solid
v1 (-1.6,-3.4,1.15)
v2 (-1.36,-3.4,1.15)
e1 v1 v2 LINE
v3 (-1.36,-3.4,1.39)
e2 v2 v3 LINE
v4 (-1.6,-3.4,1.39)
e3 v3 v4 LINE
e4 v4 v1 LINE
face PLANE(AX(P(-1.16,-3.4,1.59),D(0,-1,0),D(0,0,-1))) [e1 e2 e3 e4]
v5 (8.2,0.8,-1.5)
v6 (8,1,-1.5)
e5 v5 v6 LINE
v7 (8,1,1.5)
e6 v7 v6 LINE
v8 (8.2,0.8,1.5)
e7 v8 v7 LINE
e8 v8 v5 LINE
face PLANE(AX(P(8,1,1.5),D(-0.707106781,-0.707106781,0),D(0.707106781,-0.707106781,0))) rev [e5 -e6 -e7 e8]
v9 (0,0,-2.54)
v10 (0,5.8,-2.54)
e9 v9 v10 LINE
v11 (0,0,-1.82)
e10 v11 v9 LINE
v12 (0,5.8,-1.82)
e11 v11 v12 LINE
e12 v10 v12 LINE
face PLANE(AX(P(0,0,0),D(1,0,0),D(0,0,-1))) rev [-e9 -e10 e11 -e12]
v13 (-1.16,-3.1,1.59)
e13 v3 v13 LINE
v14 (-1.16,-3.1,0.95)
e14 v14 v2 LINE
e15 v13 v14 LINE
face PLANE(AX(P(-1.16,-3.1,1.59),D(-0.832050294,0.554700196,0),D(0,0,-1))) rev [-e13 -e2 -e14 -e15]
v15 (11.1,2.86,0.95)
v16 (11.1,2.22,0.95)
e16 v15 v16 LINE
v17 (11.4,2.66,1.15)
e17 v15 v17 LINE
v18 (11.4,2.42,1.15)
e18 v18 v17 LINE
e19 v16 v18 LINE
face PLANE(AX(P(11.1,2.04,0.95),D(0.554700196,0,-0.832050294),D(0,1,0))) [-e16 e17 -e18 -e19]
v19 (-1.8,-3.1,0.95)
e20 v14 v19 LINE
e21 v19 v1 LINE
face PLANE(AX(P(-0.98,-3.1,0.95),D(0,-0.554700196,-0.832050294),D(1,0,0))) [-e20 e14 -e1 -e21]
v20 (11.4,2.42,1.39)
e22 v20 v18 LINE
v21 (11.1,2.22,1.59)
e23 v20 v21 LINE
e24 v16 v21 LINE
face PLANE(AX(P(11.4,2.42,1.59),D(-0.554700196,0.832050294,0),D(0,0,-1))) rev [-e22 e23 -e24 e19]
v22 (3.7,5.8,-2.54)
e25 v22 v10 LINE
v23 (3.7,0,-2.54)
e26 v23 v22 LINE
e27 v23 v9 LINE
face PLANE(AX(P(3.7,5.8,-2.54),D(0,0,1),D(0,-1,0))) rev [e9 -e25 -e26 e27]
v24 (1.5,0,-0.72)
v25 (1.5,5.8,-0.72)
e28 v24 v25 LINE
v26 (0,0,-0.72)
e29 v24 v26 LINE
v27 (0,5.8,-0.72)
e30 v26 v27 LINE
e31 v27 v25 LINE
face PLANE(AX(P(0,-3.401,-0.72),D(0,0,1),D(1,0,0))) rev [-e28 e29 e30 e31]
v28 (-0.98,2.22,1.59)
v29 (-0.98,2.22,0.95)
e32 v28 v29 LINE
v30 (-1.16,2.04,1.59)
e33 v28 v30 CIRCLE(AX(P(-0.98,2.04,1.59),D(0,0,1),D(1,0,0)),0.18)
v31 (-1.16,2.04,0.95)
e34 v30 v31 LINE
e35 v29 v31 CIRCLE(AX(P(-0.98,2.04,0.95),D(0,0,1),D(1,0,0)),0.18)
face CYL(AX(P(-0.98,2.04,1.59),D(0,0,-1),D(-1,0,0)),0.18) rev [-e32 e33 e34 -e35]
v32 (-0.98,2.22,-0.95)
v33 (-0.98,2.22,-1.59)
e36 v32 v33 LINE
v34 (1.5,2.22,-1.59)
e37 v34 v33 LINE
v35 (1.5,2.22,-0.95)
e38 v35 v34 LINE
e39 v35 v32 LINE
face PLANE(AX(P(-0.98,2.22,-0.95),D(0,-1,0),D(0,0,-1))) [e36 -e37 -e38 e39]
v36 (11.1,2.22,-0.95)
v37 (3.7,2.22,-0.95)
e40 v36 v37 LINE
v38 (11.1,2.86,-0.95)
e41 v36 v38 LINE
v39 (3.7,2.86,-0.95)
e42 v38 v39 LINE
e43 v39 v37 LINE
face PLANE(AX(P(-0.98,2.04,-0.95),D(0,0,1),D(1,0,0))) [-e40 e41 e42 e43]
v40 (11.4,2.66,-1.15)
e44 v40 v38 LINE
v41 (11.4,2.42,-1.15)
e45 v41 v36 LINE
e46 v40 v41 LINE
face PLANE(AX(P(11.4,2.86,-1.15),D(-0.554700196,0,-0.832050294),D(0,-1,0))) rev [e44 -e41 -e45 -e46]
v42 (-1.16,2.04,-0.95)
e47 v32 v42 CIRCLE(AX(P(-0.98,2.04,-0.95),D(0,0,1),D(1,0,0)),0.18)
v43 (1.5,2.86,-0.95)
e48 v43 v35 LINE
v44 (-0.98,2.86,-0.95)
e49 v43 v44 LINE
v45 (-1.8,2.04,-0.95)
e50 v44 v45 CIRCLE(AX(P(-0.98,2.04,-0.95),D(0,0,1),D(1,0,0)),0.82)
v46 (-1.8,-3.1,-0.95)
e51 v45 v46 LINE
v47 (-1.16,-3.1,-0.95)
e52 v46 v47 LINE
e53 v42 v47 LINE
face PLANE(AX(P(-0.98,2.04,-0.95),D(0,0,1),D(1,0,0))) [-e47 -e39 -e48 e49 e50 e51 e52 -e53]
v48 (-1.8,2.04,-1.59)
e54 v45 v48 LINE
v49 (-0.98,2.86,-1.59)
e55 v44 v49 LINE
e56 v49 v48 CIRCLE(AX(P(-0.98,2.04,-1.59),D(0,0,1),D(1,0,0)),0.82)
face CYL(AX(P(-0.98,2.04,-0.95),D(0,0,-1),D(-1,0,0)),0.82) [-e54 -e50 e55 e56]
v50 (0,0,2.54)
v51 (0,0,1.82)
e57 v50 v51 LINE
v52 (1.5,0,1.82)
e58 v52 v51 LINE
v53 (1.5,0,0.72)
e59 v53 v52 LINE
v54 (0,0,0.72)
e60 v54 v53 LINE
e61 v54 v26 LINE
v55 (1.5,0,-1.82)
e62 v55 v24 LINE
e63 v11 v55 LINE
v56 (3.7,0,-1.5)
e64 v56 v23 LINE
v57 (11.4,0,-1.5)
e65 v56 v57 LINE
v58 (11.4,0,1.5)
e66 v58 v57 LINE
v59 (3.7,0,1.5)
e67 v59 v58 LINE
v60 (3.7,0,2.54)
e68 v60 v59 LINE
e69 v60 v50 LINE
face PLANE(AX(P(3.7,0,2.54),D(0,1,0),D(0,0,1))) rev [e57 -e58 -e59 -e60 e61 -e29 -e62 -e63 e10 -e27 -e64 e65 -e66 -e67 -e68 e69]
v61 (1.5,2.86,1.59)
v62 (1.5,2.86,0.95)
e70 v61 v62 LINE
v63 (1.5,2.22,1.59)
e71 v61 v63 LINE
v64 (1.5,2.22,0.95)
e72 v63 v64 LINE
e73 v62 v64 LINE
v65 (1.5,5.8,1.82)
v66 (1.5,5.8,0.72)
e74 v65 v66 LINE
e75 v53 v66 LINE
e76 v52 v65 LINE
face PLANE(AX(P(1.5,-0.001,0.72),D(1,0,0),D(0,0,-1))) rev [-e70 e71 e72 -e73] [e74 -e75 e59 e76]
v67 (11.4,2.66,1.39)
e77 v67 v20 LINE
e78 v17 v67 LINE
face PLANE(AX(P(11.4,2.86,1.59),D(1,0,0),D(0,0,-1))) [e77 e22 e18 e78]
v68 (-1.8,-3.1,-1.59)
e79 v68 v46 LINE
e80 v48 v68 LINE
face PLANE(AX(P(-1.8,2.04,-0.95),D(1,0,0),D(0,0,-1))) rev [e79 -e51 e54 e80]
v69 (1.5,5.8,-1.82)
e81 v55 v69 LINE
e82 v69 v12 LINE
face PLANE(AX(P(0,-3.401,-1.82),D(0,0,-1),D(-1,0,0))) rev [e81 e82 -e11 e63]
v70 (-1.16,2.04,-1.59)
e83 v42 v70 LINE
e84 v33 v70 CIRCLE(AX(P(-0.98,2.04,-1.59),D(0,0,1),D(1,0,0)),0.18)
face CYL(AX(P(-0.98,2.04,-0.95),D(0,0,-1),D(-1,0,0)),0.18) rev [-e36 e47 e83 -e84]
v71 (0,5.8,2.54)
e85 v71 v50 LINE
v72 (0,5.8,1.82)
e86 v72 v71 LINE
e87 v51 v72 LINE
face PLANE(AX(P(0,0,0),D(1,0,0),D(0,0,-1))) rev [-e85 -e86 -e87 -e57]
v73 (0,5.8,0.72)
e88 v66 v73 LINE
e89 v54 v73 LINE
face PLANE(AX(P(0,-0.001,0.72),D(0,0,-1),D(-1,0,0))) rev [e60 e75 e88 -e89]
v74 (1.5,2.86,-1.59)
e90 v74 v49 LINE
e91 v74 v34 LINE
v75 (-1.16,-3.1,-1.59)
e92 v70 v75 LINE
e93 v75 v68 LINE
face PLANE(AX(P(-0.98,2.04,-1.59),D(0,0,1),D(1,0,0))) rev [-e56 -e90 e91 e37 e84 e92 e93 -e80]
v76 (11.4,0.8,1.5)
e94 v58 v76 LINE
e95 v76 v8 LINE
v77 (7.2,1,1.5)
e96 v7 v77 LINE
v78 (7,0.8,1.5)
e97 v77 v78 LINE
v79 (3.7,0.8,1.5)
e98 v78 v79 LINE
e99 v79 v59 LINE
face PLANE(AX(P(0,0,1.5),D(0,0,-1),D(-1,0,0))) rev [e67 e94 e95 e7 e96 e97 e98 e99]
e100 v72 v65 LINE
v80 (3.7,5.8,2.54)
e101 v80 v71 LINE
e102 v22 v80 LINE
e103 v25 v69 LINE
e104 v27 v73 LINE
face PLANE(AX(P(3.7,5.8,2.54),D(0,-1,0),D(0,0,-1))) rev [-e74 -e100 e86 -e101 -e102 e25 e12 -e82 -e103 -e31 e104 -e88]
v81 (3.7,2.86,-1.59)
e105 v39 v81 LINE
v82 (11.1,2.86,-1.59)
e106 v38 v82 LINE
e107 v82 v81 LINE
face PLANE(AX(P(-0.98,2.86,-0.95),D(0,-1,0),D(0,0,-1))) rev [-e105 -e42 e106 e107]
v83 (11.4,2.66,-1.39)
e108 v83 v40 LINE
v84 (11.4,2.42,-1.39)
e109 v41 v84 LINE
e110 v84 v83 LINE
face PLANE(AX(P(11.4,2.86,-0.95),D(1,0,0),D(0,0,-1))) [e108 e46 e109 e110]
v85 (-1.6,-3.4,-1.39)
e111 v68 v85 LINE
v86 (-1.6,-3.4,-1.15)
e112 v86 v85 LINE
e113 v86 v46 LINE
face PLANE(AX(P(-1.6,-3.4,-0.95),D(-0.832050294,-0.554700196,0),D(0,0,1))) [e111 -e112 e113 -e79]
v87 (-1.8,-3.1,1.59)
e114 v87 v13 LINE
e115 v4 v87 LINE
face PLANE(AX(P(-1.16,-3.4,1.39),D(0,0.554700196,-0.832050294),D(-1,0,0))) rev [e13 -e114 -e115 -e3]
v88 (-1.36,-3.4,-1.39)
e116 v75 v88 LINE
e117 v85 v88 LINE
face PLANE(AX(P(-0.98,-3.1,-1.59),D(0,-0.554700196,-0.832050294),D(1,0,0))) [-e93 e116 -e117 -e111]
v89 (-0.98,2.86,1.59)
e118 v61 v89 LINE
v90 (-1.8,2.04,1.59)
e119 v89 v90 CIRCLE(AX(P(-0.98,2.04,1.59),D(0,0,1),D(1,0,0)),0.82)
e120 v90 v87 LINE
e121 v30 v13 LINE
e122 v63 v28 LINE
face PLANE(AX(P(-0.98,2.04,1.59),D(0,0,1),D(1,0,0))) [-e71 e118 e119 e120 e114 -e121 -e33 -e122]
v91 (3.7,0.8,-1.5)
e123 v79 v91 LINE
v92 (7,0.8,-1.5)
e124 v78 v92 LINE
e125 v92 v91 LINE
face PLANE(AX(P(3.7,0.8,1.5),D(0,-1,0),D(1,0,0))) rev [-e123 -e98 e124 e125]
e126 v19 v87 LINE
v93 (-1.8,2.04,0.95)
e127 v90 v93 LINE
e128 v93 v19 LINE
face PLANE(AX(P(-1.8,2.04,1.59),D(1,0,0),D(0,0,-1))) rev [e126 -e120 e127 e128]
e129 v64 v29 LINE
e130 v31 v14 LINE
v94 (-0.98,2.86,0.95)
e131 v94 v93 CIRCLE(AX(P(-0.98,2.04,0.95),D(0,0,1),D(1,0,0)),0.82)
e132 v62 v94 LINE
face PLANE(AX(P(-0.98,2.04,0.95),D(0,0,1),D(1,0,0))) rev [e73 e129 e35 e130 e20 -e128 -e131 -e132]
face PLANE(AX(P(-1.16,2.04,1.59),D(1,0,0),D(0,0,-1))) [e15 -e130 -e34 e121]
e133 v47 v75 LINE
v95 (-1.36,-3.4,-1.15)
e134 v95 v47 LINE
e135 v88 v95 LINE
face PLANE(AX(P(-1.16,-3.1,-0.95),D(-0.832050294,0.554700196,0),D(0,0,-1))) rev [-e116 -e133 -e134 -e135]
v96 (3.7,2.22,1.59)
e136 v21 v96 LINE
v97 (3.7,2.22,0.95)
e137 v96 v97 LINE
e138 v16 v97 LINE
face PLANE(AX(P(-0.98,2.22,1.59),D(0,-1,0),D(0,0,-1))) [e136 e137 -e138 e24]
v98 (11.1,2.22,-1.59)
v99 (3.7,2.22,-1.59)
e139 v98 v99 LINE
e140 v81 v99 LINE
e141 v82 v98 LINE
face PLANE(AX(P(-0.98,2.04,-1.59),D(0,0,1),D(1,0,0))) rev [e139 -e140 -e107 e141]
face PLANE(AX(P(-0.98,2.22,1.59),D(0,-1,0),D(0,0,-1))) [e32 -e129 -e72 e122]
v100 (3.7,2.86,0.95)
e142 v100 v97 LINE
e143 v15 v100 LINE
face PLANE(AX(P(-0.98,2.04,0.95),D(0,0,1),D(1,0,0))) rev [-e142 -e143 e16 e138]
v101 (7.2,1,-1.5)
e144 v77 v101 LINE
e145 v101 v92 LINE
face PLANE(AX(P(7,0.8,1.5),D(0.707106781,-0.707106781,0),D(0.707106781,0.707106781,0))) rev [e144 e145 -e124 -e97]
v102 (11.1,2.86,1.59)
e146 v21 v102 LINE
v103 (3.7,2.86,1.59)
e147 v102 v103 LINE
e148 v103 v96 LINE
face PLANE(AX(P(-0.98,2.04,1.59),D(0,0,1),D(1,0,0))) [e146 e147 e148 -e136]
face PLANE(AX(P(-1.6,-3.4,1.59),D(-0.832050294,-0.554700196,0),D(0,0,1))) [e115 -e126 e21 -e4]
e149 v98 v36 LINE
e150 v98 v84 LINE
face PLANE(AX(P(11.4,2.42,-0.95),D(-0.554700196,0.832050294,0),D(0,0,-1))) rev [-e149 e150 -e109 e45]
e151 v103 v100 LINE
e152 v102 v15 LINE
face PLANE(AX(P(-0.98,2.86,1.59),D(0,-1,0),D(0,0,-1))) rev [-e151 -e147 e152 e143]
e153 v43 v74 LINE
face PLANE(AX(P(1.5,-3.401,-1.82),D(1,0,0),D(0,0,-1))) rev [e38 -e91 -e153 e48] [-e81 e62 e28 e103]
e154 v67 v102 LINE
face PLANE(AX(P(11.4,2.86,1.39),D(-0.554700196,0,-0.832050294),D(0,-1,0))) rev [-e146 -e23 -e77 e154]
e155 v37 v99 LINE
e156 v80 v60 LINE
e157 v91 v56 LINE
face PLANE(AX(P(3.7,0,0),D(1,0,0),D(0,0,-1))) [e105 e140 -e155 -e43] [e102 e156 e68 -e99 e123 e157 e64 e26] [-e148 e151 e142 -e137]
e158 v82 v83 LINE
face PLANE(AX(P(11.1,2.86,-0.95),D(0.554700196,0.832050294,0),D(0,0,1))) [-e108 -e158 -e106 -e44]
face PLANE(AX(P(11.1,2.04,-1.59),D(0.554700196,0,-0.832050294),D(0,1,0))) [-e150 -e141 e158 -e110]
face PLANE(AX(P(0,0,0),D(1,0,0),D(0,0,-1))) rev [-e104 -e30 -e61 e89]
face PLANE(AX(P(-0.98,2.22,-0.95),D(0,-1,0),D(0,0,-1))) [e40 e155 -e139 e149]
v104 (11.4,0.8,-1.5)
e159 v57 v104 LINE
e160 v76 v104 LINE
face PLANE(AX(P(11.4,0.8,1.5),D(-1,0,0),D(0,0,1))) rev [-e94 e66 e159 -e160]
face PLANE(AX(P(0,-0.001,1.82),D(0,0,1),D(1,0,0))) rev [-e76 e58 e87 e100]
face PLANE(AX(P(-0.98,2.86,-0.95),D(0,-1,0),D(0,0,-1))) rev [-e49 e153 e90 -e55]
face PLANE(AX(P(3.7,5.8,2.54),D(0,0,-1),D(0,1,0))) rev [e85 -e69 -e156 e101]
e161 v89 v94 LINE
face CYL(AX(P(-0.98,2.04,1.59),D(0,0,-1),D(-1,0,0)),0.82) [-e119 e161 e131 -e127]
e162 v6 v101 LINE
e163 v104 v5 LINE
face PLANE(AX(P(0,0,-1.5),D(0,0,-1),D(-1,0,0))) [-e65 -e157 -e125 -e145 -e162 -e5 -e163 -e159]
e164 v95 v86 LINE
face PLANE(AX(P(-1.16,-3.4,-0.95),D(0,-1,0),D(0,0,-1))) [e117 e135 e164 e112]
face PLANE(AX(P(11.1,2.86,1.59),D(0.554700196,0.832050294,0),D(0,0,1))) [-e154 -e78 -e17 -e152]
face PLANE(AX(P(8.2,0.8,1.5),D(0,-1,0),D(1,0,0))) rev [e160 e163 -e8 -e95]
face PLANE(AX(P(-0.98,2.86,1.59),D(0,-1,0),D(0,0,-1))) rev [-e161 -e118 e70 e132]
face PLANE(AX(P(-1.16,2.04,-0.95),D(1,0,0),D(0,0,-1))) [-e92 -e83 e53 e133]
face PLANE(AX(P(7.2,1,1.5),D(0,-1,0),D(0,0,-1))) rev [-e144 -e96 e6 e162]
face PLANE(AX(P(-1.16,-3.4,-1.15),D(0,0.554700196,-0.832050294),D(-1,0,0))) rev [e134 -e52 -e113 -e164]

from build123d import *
from OCP.BRepFilletAPI import BRepFilletAPI_MakeChamfer

# Parameters (mm, degrees)
SKETCH_1_W                           = 5.08
SKETCH_1_H                           = 5.8
EXTRUDE_1_DEPTH                      = 3.7
CUT_EXTRUDE_1_REACH                  = 9.334
SKETCH_5_W                           = 1.5
SKETCH_5_H                           = 1.1
EXTRUDE_START                        = 1.27
EXTRUDE_1_2_DEPTH                    = 0.32
CHAMFER_1_SIZE                       = 0.2
CHAMFER_1_SIZE2                      = 0.3
CHAMFER_2_SIZE                       = 0.3
CHAMFER_2_SIZE_2                     = 0.2
EXTRUDE_2_DEPTH                      = 1.5
PATTERN_LINEAR_2_COUNT               = 2
PATTERN_LINEAR_2_PITCH               = 2.54
CHAMFER_1_OF_PATTERN_LINEAR_2_SIZE2  = 0.2
CHAMFER_1_OF_PATTERN_LINEAR_2_SIZE   = 0.3
CHAMFER_2_OF_PATTERN_LINEAR_2_SIZE   = 0.3
CHAMFER_2_OF_PATTERN_LINEAR_2_SIZE_2 = 0.2


with BuildPart() as part:
    # Эскиз1 → Extrude 1 (new body)
    with BuildSketch(Plane(origin=(0, 0, 0), x_dir=(0, 0, -1), z_dir=(1, 0, 0))):
        with Locations((0, 2.9)):
            Rectangle(SKETCH_1_W, SKETCH_1_H)
    extrude(amount=EXTRUDE_1_DEPTH)

    # Эскиз5 → Вырез-Вытянуть1 (cut, up to next)
    with BuildSketch(Plane(origin=(0, 5.8, 0), x_dir=(1, 0, 0), z_dir=(0, 1, 0)), mode=Mode.PRIVATE) as cut_extrude_1_sk1:
        with Locations((0.75, -1.27)):
            Rectangle(SKETCH_5_W, SKETCH_5_H)
    cut_extrude_1_tool1 = extrude(cut_extrude_1_sk1.sketch, amount=-CUT_EXTRUDE_1_REACH, mode=Mode.PRIVATE) & part.part
    cut_extrude_1 = cut_extrude_1_tool1.solids().sort_by_distance((0.75, 5.8, 1.27))[0]
    add(cut_extrude_1, mode=Mode.SUBTRACT)

    # Эскиз3 → Extrude 1 2 (add, symmetric)
    with BuildSketch(Plane.XY.offset(EXTRUDE_START)):
        with BuildLine():
            Line((-1.16, -3.4), (-1.16, 2.04))
            ThreePointArc((-1.16, 2.04), (-1.107279221, 2.167279221), (-0.98, 2.22))
            Line((-0.98, 2.22), (11.4, 2.22))
            Line((11.4, 2.22), (11.4, 2.86))
            Line((11.4, 2.86), (-0.98, 2.86))
            ThreePointArc((-0.98, 2.86), (-1.559827561, 2.619827561), (-1.8, 2.04))
            Line((-1.8, 2.04), (-1.8, -3.4))
            Line((-1.8, -3.4), (-1.16, -3.4))
        make_face()
    extrude_1_2 = extrude(amount=EXTRUDE_1_2_DEPTH, both=True)

    # Фаска1
    chamfer_1_edges = [part.edges().sort_by_distance(p)[0] for p in [
        (11.4, 2.54, 1.59),
        (11.4, 2.22, 1.27),
        (11.4, 2.86, 1.27),
        (11.4, 2.54, 0.95),
    ]]
    chamfer_1_side = [part.faces().sort_by_distance(p)[0] for p in [
        (11.4, 2.54, 1.27),
    ]]
    chamfer(chamfer_1_edges, length=CHAMFER_1_SIZE, length2=CHAMFER_1_SIZE2, reference=chamfer_1_side[0])

    # Фаска2
    chamfer_2_edges_1 = [part.edges().sort_by_distance(p)[0] for p in [
        (-1.48, -3.4, 0.95),
    ]]
    chamfer_2_side_1 = [part.faces().sort_by_distance(p)[0] for p in [
        (-1.48, -3.396, 0.95),
    ]]
    chamfer_2_edges_2 = [part.edges().sort_by_distance(p)[0] for p in [
        (-1.48, -3.4, 1.59),
    ]]
    chamfer_2_side_2 = [part.faces().sort_by_distance(p)[0] for p in [
        (-1.48, -3.396, 1.59),
    ]]
    chamfer_2_edges_3 = [part.edges().sort_by_distance(p)[0] for p in [
        (-1.8, -3.4, 1.27),
    ]]
    chamfer_2_side_3 = [part.faces().sort_by_distance(p)[0] for p in [
        (-1.796, -3.4, 1.27),
    ]]
    chamfer_2_edges_4 = [part.edges().sort_by_distance(p)[0] for p in [
        (-1.16, -3.4, 1.27),
    ]]
    chamfer_2_side_4 = [part.faces().sort_by_distance(p)[0] for p in [
        (-1.16, -3.396, 1.27),
    ]]
    chamfer_2 = BRepFilletAPI_MakeChamfer(part.part.solid().wrapped)
    for e in chamfer_2_edges_1:
        chamfer_2.Add(CHAMFER_2_SIZE - 0.0001, CHAMFER_2_SIZE_2 - 0.0001, e.wrapped, chamfer_2_side_1[0].wrapped)
    for e in chamfer_2_edges_2:
        chamfer_2.Add(CHAMFER_2_SIZE - 0.0001, CHAMFER_2_SIZE_2 - 0.0001, e.wrapped, chamfer_2_side_2[0].wrapped)
    for e in chamfer_2_edges_3:
        chamfer_2.Add(CHAMFER_2_SIZE_2 - 0.0001, CHAMFER_2_SIZE - 0.0001, e.wrapped, chamfer_2_side_3[0].wrapped)
    for e in chamfer_2_edges_4:
        chamfer_2.Add(CHAMFER_2_SIZE - 0.0001, CHAMFER_2_SIZE_2 - 0.0001, e.wrapped, chamfer_2_side_4[0].wrapped)
    add(Compound.cast(chamfer_2.Shape()), mode=Mode.REPLACE)  # a hair under: the kernel refuses the full size

    # Эскиз4 → Бобышка-Вытянуть2 (add, symmetric)
    with BuildSketch(Plane.XY):
        Polygon((3.7, 0), (3.7, 0.8), (7, 0.8), (7.2, 1), (8, 1), (8.2, 0.8), (11.4, 0.8), (11.4, 0), align=None)
    extrude(amount=EXTRUDE_2_DEPTH, both=True)

    # Линейный массив2: Вырез-Вытянуть1, Extrude 1 2 ×2
    with Locations(*[(0, 0, -i * PATTERN_LINEAR_2_PITCH) for i in range(1, PATTERN_LINEAR_2_COUNT)]):
        add(cut_extrude_1, mode=Mode.SUBTRACT)
        add(extrude_1_2)

    # Фаска1 of Линейный массив2
    chamfer_1_of_pattern_linear_2_edges = [part.edges().sort_by_distance(p)[0] for p in [
        (11.4, 2.54, -0.95),
        (11.4, 2.22, -1.27),
        (11.4, 2.86, -1.27),
        (11.4, 2.54, -1.59),
    ]]
    chamfer(chamfer_1_of_pattern_linear_2_edges, length=CHAMFER_1_OF_PATTERN_LINEAR_2_SIZE, length2=CHAMFER_1_OF_PATTERN_LINEAR_2_SIZE2)

    # Фаска2 of Линейный массив2
    chamfer_2_of_pattern_linear_2_edges_1 = [part.edges().sort_by_distance(p)[0] for p in [
        (-1.48, -3.4, -1.59),
    ]]
    chamfer_2_of_pattern_linear_2_side_1 = [part.faces().sort_by_distance(p)[0] for p in [
        (-1.48, -3.396, -1.59),
    ]]
    chamfer_2_of_pattern_linear_2_edges_2 = [part.edges().sort_by_distance(p)[0] for p in [
        (-1.48, -3.4, -0.95),
    ]]
    chamfer_2_of_pattern_linear_2_side_2 = [part.faces().sort_by_distance(p)[0] for p in [
        (-1.48, -3.396, -0.95),
    ]]
    chamfer_2_of_pattern_linear_2_edges_3 = [part.edges().sort_by_distance(p)[0] for p in [
        (-1.8, -3.4, -1.27),
    ]]
    chamfer_2_of_pattern_linear_2_side_3 = [part.faces().sort_by_distance(p)[0] for p in [
        (-1.796, -3.4, -1.27),
    ]]
    chamfer_2_of_pattern_linear_2_edges_4 = [part.edges().sort_by_distance(p)[0] for p in [
        (-1.16, -3.4, -1.27),
    ]]
    chamfer_2_of_pattern_linear_2_side_4 = [part.faces().sort_by_distance(p)[0] for p in [
        (-1.16, -3.396, -1.27),
    ]]
    chamfer_2_of_pattern_linear_2 = BRepFilletAPI_MakeChamfer(part.part.solid().wrapped)
    for e in chamfer_2_of_pattern_linear_2_edges_1:
        chamfer_2_of_pattern_linear_2.Add(CHAMFER_2_OF_PATTERN_LINEAR_2_SIZE - 0.0001, CHAMFER_2_OF_PATTERN_LINEAR_2_SIZE_2 - 0.0001, e.wrapped, chamfer_2_of_pattern_linear_2_side_1[0].wrapped)
    for e in chamfer_2_of_pattern_linear_2_edges_2:
        chamfer_2_of_pattern_linear_2.Add(CHAMFER_2_OF_PATTERN_LINEAR_2_SIZE - 0.0001, CHAMFER_2_OF_PATTERN_LINEAR_2_SIZE_2 - 0.0001, e.wrapped, chamfer_2_of_pattern_linear_2_side_2[0].wrapped)
    for e in chamfer_2_of_pattern_linear_2_edges_3:
        chamfer_2_of_pattern_linear_2.Add(CHAMFER_2_OF_PATTERN_LINEAR_2_SIZE_2 - 0.0001, CHAMFER_2_OF_PATTERN_LINEAR_2_SIZE - 0.0001, e.wrapped, chamfer_2_of_pattern_linear_2_side_3[0].wrapped)
    for e in chamfer_2_of_pattern_linear_2_edges_4:
        chamfer_2_of_pattern_linear_2.Add(CHAMFER_2_OF_PATTERN_LINEAR_2_SIZE - 0.0001, CHAMFER_2_OF_PATTERN_LINEAR_2_SIZE_2 - 0.0001, e.wrapped, chamfer_2_of_pattern_linear_2_side_4[0].wrapped)
    add(Compound.cast(chamfer_2_of_pattern_linear_2.Shape()), mode=Mode.REPLACE)  # a hair under: the kernel refuses the full size


solid = part.part
